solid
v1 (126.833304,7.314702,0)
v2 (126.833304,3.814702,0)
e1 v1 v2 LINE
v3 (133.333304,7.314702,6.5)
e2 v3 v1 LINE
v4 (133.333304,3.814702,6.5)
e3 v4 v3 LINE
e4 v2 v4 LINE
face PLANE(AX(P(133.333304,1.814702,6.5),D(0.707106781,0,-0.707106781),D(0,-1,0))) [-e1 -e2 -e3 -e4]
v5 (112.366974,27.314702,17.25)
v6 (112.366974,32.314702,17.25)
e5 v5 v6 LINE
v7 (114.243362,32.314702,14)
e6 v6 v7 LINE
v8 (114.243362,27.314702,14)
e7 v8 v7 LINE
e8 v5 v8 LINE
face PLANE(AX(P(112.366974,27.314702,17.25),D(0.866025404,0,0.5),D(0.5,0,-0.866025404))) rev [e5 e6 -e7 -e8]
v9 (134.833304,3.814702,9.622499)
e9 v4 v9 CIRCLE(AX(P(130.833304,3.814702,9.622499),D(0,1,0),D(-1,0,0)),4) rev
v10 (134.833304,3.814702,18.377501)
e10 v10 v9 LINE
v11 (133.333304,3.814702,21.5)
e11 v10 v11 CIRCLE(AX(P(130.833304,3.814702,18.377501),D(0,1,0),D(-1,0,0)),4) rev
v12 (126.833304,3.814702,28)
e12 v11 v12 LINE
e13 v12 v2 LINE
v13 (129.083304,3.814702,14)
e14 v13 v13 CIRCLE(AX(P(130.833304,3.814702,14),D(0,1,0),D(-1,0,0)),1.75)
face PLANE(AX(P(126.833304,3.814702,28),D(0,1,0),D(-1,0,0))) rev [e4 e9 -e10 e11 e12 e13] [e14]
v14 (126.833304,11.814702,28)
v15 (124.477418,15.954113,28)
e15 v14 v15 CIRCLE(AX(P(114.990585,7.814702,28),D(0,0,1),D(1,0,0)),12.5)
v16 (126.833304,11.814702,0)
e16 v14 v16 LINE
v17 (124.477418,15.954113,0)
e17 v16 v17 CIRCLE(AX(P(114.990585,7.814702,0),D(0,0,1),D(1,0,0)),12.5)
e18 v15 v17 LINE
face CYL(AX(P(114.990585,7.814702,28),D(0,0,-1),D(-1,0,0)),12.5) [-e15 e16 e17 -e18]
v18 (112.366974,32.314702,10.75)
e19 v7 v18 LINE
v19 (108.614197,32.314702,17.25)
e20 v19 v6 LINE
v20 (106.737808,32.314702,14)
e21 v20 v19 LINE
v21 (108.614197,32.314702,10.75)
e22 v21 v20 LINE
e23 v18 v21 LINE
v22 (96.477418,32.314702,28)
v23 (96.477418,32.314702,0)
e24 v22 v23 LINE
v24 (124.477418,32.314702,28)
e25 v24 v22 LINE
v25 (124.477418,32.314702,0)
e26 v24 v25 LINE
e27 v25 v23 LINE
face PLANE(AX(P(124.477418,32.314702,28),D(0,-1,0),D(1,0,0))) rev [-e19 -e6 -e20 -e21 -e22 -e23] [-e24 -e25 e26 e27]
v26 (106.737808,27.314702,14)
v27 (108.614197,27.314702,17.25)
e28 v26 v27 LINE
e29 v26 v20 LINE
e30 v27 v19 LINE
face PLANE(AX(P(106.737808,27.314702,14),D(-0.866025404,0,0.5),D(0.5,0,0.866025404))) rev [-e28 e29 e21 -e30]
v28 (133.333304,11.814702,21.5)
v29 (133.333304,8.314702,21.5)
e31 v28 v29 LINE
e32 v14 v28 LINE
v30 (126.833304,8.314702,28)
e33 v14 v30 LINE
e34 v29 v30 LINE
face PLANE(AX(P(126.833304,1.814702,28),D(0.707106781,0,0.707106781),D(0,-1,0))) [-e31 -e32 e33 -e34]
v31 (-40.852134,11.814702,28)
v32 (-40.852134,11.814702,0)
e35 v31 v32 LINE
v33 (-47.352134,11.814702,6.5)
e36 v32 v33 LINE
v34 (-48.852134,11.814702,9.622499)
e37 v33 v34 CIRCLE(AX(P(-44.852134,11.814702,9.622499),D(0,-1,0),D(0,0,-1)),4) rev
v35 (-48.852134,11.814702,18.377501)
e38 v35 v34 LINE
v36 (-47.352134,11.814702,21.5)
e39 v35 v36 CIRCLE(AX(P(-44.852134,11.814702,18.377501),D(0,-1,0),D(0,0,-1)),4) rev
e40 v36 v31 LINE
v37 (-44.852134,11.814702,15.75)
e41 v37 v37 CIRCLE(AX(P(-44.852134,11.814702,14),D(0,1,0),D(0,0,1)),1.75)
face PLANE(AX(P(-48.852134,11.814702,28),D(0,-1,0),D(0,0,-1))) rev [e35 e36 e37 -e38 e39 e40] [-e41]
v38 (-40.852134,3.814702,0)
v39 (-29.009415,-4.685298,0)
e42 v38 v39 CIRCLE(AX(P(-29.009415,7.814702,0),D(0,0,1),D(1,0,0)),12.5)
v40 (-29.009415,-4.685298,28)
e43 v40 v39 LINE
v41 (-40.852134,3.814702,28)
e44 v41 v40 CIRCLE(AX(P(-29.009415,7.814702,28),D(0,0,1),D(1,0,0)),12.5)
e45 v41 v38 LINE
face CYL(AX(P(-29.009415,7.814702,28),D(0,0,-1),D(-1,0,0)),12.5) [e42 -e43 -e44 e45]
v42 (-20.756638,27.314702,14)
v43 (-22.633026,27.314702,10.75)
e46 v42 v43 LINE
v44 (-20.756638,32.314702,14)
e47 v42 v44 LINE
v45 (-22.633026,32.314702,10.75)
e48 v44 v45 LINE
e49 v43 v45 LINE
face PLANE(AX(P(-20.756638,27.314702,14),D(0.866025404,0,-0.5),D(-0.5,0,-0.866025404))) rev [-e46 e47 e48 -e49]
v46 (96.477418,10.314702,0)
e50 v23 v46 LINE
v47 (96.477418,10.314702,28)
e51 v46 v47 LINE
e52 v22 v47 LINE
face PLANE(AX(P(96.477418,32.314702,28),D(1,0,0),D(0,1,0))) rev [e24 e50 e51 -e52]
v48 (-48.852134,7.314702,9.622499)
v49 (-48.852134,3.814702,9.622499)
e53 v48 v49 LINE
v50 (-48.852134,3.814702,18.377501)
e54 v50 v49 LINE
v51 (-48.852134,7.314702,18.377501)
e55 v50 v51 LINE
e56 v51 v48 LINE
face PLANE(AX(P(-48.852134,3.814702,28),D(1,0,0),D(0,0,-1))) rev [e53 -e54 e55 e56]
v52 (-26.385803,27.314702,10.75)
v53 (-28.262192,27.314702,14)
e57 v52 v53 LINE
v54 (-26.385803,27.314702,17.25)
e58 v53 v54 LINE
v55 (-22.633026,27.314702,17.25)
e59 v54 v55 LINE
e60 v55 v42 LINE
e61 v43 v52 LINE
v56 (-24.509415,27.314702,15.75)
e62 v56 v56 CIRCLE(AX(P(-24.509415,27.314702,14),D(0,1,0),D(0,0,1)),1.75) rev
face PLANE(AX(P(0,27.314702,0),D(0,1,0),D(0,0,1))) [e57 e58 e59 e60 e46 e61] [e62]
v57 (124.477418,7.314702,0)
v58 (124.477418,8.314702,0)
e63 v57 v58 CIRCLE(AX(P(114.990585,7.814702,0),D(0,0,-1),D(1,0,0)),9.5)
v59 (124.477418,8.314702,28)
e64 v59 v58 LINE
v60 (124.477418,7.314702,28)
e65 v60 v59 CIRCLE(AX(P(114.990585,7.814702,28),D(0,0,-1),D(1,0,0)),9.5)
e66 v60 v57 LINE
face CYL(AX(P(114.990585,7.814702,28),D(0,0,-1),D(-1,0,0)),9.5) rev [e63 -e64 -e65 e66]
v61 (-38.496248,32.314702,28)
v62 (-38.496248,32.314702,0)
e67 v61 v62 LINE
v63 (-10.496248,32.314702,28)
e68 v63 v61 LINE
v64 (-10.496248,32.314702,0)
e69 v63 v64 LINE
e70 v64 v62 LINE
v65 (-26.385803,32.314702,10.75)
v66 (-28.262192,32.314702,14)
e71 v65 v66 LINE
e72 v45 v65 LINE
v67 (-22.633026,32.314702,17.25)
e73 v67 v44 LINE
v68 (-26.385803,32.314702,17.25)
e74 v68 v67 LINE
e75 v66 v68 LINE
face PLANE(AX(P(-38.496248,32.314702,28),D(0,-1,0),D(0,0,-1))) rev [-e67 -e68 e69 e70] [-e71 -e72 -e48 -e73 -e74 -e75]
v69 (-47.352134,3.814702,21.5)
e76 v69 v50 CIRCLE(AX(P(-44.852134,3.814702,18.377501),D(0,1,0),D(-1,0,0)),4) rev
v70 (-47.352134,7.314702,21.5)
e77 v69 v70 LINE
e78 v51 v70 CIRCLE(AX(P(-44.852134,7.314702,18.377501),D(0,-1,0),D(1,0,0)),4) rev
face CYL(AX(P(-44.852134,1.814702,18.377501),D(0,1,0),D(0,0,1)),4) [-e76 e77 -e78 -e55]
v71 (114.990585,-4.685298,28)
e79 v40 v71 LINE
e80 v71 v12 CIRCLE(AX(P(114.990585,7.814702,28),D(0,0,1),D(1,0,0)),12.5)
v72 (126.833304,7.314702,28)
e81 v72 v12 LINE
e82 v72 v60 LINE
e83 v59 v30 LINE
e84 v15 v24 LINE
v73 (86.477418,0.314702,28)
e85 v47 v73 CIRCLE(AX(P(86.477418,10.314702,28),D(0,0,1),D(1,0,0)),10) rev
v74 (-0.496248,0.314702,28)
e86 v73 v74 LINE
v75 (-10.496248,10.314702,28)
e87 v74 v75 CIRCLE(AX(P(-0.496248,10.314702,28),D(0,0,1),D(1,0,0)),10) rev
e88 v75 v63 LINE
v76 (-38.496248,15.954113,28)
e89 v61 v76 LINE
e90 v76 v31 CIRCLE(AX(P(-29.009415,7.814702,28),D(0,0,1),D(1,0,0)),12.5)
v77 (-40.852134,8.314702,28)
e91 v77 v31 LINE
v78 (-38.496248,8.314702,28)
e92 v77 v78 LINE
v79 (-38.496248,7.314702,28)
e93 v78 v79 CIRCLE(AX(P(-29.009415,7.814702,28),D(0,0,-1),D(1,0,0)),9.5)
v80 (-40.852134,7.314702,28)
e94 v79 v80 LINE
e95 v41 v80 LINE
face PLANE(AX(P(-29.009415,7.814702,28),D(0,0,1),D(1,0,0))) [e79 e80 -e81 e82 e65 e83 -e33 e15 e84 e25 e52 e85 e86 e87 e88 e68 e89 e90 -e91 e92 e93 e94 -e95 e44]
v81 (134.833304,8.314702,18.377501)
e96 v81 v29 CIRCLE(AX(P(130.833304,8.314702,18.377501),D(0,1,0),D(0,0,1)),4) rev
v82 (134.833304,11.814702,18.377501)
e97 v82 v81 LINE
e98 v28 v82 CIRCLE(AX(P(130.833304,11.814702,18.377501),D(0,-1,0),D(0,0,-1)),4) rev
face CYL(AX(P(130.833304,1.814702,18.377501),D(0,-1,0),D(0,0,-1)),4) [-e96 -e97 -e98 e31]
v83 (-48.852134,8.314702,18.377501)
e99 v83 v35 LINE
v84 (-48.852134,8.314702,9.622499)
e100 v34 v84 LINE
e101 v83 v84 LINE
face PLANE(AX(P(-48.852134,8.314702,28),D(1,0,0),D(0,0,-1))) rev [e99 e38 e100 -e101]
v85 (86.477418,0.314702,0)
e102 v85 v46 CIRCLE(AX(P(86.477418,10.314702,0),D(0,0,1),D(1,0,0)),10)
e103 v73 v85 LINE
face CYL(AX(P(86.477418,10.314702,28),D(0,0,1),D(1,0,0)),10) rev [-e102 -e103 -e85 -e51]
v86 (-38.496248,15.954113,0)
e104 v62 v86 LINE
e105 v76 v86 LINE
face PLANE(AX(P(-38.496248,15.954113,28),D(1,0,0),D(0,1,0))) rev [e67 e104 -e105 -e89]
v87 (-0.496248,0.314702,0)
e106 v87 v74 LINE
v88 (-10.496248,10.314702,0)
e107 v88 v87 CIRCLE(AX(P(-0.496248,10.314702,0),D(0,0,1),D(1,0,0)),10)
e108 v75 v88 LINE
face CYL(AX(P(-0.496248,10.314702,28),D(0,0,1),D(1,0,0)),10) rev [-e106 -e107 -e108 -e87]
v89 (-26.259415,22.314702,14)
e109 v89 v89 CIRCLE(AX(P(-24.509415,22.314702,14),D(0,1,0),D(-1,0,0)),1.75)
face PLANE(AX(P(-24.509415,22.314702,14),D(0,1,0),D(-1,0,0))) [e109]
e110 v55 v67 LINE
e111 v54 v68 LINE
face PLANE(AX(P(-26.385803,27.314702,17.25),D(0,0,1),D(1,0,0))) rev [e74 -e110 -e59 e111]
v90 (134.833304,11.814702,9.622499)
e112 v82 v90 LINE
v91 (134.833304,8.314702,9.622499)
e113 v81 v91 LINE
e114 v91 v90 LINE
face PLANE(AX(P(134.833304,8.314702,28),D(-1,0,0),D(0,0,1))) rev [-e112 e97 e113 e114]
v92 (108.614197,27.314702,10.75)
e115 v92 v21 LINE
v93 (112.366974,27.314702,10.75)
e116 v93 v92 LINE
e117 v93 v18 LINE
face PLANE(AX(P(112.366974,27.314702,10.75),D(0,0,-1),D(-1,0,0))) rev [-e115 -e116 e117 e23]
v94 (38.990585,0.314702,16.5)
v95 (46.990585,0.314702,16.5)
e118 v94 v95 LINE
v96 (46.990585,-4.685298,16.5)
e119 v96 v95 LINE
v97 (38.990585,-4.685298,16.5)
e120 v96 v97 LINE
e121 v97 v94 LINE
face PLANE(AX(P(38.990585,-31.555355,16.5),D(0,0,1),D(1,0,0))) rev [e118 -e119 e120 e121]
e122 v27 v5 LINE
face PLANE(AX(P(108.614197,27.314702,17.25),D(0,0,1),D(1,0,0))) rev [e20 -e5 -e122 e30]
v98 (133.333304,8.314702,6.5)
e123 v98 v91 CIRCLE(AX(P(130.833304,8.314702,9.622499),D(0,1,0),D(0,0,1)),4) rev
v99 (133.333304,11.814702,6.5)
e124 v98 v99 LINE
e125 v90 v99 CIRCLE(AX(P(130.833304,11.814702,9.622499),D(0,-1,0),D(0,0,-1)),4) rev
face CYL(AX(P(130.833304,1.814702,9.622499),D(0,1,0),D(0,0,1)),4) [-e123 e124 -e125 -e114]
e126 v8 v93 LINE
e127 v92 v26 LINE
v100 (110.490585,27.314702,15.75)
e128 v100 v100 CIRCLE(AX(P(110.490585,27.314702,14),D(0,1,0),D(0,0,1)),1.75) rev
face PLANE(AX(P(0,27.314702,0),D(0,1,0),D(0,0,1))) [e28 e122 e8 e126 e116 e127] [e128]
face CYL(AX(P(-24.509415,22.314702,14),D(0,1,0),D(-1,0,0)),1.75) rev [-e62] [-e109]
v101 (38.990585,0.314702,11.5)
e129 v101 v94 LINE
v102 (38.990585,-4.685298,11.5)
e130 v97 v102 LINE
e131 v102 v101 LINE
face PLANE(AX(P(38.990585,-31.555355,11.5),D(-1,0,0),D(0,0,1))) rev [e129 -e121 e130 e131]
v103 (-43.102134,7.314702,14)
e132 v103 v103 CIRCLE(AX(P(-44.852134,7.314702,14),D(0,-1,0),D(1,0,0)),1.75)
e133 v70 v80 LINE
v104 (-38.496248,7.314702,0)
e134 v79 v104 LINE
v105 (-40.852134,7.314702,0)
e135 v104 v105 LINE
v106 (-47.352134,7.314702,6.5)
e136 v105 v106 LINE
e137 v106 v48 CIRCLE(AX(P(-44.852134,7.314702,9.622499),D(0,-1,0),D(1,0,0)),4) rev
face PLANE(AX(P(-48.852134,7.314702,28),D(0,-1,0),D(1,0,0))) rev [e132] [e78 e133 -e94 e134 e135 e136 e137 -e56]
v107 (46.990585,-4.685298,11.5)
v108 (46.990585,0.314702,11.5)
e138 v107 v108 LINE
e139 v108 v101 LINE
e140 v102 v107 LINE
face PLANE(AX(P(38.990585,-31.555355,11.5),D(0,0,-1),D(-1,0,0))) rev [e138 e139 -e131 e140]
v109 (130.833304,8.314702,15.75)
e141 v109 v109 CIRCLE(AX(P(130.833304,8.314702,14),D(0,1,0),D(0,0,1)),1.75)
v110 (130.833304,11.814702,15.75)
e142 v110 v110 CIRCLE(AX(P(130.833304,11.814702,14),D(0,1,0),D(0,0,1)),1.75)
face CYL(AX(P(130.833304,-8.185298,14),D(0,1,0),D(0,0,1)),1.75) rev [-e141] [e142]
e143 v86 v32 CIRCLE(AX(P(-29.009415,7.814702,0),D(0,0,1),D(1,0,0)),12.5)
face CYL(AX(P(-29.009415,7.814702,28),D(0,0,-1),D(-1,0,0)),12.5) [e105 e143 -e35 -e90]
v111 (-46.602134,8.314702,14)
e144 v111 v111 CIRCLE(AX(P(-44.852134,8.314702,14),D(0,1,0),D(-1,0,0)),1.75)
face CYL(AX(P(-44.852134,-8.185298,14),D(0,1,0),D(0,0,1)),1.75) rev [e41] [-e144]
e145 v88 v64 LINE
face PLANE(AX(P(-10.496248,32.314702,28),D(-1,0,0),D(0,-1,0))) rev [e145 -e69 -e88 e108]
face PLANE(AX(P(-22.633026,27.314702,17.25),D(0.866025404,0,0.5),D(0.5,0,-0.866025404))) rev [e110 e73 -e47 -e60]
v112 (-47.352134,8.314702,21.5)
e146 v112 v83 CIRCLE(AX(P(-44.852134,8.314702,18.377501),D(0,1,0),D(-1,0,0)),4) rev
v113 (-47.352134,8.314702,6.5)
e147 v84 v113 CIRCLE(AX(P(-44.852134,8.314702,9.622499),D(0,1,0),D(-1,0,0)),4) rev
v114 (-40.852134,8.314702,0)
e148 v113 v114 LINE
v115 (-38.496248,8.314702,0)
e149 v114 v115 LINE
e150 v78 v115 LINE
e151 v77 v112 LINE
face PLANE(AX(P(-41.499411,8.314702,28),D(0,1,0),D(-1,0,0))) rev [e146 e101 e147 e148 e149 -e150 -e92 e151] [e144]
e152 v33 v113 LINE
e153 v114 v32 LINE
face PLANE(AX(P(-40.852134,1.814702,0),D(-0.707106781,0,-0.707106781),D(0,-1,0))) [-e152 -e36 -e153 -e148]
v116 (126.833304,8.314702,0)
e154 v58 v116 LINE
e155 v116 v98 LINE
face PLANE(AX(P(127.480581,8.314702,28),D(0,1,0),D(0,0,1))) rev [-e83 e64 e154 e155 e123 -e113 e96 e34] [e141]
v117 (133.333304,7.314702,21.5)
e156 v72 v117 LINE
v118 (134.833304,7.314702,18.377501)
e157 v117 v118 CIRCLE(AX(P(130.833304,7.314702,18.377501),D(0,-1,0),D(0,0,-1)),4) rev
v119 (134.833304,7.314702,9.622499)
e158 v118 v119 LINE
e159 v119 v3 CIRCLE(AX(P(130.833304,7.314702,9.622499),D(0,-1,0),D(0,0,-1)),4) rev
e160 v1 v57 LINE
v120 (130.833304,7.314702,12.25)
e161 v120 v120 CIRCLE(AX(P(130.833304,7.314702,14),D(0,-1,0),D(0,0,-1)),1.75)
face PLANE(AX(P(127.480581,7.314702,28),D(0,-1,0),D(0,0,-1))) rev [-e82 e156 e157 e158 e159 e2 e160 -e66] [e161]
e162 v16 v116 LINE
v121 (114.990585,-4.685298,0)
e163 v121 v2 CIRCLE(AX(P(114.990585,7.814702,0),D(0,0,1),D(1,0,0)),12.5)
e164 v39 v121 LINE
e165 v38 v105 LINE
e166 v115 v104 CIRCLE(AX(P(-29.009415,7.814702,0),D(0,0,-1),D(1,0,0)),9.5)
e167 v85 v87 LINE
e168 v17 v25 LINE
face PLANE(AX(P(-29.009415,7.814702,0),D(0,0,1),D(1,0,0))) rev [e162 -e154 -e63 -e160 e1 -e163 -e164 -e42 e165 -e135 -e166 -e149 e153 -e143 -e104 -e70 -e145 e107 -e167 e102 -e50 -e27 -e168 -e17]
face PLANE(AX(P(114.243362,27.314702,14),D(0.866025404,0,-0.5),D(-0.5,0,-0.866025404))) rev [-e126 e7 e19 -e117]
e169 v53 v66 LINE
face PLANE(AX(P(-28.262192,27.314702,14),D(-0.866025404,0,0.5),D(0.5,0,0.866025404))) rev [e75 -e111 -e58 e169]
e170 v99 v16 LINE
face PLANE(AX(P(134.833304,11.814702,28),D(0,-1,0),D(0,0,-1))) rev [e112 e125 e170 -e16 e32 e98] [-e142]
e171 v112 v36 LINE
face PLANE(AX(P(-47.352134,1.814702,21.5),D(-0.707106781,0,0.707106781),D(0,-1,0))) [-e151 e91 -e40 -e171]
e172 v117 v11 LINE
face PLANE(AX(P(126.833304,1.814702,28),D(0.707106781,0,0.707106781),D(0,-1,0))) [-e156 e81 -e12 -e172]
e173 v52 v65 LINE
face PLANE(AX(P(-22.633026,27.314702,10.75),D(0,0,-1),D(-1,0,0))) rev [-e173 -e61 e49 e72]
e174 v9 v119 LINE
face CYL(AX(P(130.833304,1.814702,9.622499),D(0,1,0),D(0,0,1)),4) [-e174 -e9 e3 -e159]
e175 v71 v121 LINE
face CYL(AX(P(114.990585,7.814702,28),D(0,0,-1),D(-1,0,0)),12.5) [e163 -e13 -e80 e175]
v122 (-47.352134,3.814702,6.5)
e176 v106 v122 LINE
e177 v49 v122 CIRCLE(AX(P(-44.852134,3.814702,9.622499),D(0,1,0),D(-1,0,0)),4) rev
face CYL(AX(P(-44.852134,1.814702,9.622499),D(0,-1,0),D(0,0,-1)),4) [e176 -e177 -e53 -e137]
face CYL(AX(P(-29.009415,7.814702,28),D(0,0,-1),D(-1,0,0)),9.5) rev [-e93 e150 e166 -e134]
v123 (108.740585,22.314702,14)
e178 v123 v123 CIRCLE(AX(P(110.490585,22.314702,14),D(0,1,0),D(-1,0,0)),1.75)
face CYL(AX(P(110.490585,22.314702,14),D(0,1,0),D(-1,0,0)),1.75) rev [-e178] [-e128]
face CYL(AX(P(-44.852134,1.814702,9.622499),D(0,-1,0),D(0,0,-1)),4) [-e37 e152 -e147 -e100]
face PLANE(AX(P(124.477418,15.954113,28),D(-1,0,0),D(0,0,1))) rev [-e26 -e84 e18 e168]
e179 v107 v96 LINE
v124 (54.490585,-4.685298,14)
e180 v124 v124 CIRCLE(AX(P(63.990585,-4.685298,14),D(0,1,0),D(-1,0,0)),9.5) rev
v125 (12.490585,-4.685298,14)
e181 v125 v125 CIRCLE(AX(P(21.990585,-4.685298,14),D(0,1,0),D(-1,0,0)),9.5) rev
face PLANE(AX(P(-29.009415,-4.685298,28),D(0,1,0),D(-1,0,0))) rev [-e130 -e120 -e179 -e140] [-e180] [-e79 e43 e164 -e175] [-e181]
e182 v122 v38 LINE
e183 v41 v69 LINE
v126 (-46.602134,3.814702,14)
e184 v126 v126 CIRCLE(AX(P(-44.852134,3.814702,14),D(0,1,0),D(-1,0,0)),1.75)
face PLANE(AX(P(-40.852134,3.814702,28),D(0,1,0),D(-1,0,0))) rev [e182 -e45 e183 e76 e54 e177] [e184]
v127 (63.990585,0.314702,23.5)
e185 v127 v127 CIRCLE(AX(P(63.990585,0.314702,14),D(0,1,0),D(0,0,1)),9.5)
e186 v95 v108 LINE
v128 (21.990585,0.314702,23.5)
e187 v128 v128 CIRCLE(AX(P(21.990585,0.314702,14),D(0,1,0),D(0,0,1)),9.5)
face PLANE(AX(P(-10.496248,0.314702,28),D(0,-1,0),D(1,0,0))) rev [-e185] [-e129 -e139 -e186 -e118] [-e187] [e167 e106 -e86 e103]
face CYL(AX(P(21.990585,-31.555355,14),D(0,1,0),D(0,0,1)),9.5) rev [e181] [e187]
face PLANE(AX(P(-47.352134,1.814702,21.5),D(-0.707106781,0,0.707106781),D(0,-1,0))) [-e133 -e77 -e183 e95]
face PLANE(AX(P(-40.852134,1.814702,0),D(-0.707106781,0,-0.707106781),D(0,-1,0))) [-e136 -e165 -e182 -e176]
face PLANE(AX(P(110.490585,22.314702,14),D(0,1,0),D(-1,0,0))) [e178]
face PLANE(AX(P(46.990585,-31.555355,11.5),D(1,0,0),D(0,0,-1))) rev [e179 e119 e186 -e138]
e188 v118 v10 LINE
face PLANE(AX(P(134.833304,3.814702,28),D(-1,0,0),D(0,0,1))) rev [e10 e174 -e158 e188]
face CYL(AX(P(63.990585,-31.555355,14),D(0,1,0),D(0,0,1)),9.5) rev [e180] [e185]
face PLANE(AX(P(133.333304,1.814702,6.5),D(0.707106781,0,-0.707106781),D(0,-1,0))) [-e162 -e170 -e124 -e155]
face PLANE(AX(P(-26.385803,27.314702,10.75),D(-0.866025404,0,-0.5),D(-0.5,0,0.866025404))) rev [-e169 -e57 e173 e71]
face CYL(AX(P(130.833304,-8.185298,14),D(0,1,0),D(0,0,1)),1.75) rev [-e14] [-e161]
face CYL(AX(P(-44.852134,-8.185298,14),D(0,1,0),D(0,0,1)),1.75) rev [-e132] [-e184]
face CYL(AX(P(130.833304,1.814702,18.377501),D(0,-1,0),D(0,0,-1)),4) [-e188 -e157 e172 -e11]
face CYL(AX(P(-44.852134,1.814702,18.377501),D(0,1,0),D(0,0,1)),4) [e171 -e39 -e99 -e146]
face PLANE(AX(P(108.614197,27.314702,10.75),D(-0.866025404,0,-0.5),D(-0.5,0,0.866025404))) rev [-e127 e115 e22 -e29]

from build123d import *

# Parameters (mm, degrees)
BOSS_EXTRUDE3_DEPTH = 28
FILLET1_R           = 10
SKETCH8_R           = 9.5
SKETCH8_W           = 8
SKETCH8_H           = 5
CUT_EXTRUDE4_DEPTH  = 5
SKETCH9_R           = 1.75
CUT_EXTRUDE5_DEPTH  = 20
SKETCH10_R          = 1.75
CUT_EXTRUDE6_DEPTH  = 10
CUT_EXTRUDE8_DEPTH  = 10
CHAMFER1_SIZE       = 6.5
FILLET3_R           = 4
CUT_EXTRUDE9_DEPTH  = 5


# Some blends are built 0.0001 mm under size
with BuildPart() as part:
    # Sketch7 → Boss-Extrude3 (new body)
    with BuildSketch(Plane.XY):
        with BuildLine():
            Line((-29.009414831, -4.685297633), (114.990585169, -4.685297633))
            ThreePointArc((114.990585169, -4.685297633), (122.279275038, -2.340345638), (126.833304451, 3.814702367))
            Line((126.833304451, 3.814702367), (134.833304451, 3.814702367))
            Line((134.833304451, 3.814702367), (134.833304451, 7.314702367))
            Line((134.833304451, 7.314702367), (127.480581166, 7.314702367))
            Line((127.480581166, 7.314702367), (124.47741815, 7.314702367))
            ThreePointArc((124.47741815, 7.314702367), (105.490585169, 7.814702367), (124.47741815, 8.314702367))
            Line((124.47741815, 8.314702367), (127.480581166, 8.314702367))
            Line((127.480581166, 8.314702367), (134.833304451, 8.314702367))
            Line((134.833304451, 8.314702367), (134.833304451, 11.814702367))
            Line((134.833304451, 11.814702367), (126.833304451, 11.814702367))
            ThreePointArc((126.833304451, 11.814702367), (125.854338173, 13.997652364), (124.47741815, 15.954112665))
            Line((124.47741815, 15.954112665), (124.47741815, 32.314702367))
            Line((124.47741815, 32.314702367), (96.47741815, 32.314702367))
            Line((96.47741815, 32.314702367), (96.47741815, 0.314702367))
            Line((96.47741815, 0.314702367), (-10.496247811, 0.314702367))
            Line((-10.496247811, 0.314702367), (-10.496247811, 32.314702367))
            Line((-10.496247811, 32.314702367), (-38.496247811, 32.314702367))
            Line((-38.496247811, 32.314702367), (-38.496247811, 15.954112665))
            ThreePointArc((-38.496247811, 15.954112665), (-39.873167835, 13.997652364), (-40.852134113, 11.814702367))
            Line((-40.852134113, 11.814702367), (-48.852134113, 11.814702367))
            Line((-48.852134113, 11.814702367), (-48.852134113, 8.314702367))
            Line((-48.852134113, 8.314702367), (-41.499410828, 8.314702367))
            Line((-41.499410828, 8.314702367), (-38.496247811, 8.314702367))
            ThreePointArc((-38.496247811, 8.314702367), (-19.509414831, 7.814702367), (-38.496247811, 7.314702367))
            Line((-38.496247811, 7.314702367), (-41.499410828, 7.314702367))
            Line((-41.499410828, 7.314702367), (-48.852134113, 7.314702367))
            Line((-48.852134113, 7.314702367), (-48.852134113, 3.814702367))
            Line((-48.852134113, 3.814702367), (-40.852134113, 3.814702367))
            ThreePointArc((-40.852134113, 3.814702367), (-36.298104699, -2.340345638), (-29.009414831, -4.685297633))
        make_face()
    extrude(amount=BOSS_EXTRUDE3_DEPTH)

    # Fillet1
    fillet1_edges = [part.edges().sort_by_distance(p)[0] for p in [
        (-10.496247811, 0.314702367, 14),
        (96.47741815, 0.314702367, 14),
    ]]
    fillet(fillet1_edges, radius=FILLET1_R)

    # Sketch8 → Cut-Extrude4 (cut)
    with BuildSketch(Plane(origin=(0, 0.314702367, 0), x_dir=(1, 0, 0), z_dir=(0, 1, 0))):
        with Locations(Location((63.990585169, -14, 0), (0, 0, 270))):
            Circle(SKETCH8_R)
        with Locations(Location((21.990585169, -14, 0), (0, 0, 270))):
            Circle(SKETCH8_R)
        with Locations((42.990585169, -14)):
            Rectangle(SKETCH8_W, SKETCH8_H)
    extrude(amount=-CUT_EXTRUDE4_DEPTH, mode=Mode.SUBTRACT)

    # Sketch9 → Cut-Extrude5 (cut)
    with BuildSketch(Plane(origin=(0, 11.814702367, 0), x_dir=(1, 0, 0), z_dir=(0, 1, 0))):
        with Locations(Location((130.833304451, -14, 0), (0, 0, 270))):
            Circle(SKETCH9_R)
        with Locations(Location((-44.852134113, -14, 0), (0, 0, 180))):
            Circle(SKETCH9_R)
    extrude(amount=-CUT_EXTRUDE5_DEPTH, mode=Mode.SUBTRACT)

    # Sketch10 → Cut-Extrude6 (cut)
    with BuildSketch(Plane(origin=(0, 32.314702367, 0), x_dir=(1, 0, 0), z_dir=(0, 1, 0))):
        with Locations(Location((110.490585169, -14, 0), (0, 0, 180))):
            Circle(SKETCH10_R)
        with Locations(Location((-24.509414831, -14, 0), (0, 0, 180))):
            Circle(SKETCH10_R)
    extrude(amount=-CUT_EXTRUDE6_DEPTH, mode=Mode.SUBTRACT)

    # Sketch12 → Cut-Extrude8 (cut)
    with BuildSketch(Plane(origin=(0, 11.814702367, 0), x_dir=(1, 0, 0), z_dir=(0, 1, 0))):
        Polygon((130.833304451, -21.5), (126.833304451, -21.5), (126.833304451, -28), (134.833304451, -28), (134.833304451, -21.5), align=None)
        Polygon((130.833304451, -6.5), (126.833304451, -6.5), (126.833304451, 0), (134.833304451, 0), (134.833304451, -6.5), align=None)
        Polygon((-44.852134113, -6.5), (-40.852134113, -6.5), (-40.852134113, 0), (-48.852134113, 0), (-48.852134113, -6.5), align=None)
        Polygon((-44.852134113, -21.5), (-48.852134113, -21.5), (-48.852134113, -28), (-40.852134113, -28), (-40.852134113, -21.5), align=None)
    extrude(amount=-CUT_EXTRUDE8_DEPTH, mode=Mode.SUBTRACT)

    # Chamfer1
    chamfer1_edges = [part.edges().sort_by_distance(p)[0] for p in [
        (126.833304451, 10.064702367, 6.5),
        (126.833304451, 5.564702367, 6.5),
        (126.833304451, 5.564702367, 21.5),
        (126.833304451, 10.064702367, 21.5),
        (-40.852134113, 5.564702367, 21.5),
        (-40.852134113, 5.564702367, 6.5),
        (-40.852134113, 10.064702367, 6.5),
        (-40.852134113, 10.064702367, 21.5),
    ]]
    chamfer(chamfer1_edges, length=CHAMFER1_SIZE - 0.0001)  # a hair under: the kernel refuses the full size

    # Fillet3
    # the kernel refuses this fillet: 4 mm, written as the material it takes off along each edge
    with BuildSketch(Plane(origin=(134.833304451, 19.621150019, 21.5), x_dir=(-1, 0, 0), z_dir=(0, -1, 0))) as fillet3_piece_1:
        with BuildLine():
            CenterArc((4, 3.122579061), FILLET3_R, 180, 51.319647456)
            Line((0, 3.122579061), (-0.08, 3.122579061))
            Line((-0.08, 3.122579061), (-0.08, 0))
            Line((-0.08, 0), (0, -0.08))
            ThreePointArc((0, -0.08), (0.75005, -0.08), (1.450102, -0.062451581))
            Line((1.450102, -0.062451581), (1.5001, 0))
        make_face()
    extrude(amount=19.112895303, mode=Mode.SUBTRACT)
    with BuildSketch(Plane(origin=(134.833304451, 15.121150019, 21.5), x_dir=(0, 0, -1), z_dir=(0, -1, 0)), Plane(origin=(-48.852134113, 15.121150019, 6.5), x_dir=(0, 0, 1), z_dir=(0, -1, 0)), Plane(origin=(-48.852134113, 19.621150019, 6.5), x_dir=(0, 0, 1), z_dir=(0, -1, 0))) as fillet3_piece_2:
        with BuildLine():
            CenterArc((3.122579061, -4), FILLET3_R, 90, 51.319647456)
            Line((0, -1.5001), (-0.062451581, -1.450102))
            ThreePointArc((-0.062451581, -1.450102), (-0.08, -0.75005), (-0.08, 0))
            Line((-0.08, 0), (0, 0.08))
            Line((0, 0.08), (3.122579061, 0.08))
            Line((3.122579061, 0.08), (3.122579061, 0))
        make_face()
    extrude(amount=19.112895303, mode=Mode.SUBTRACT)
    with BuildSketch(Plane(origin=(134.833304451, 15.121150019, 6.5), x_dir=(0, 0, 1), z_dir=(0, -1, 0)), Plane(origin=(134.833304451, 19.621150019, 6.5), x_dir=(0, 0, 1), z_dir=(0, -1, 0)), Plane(origin=(-48.852134113, 19.621150019, 21.5), x_dir=(0, 0, -1), z_dir=(0, -1, 0))) as fillet3_piece_3:
        with BuildLine():
            CenterArc((3.122579061, 4), FILLET3_R, 218.680352544, 51.319647456)
            Line((0, 1.5001), (-0.062451581, 1.450102))
            ThreePointArc((-0.062451581, 1.450102), (-0.08, 0.75005), (-0.08, 0))
            Line((-0.08, 0), (0, -0.08))
            Line((0, -0.08), (3.122579061, -0.08))
            Line((3.122579061, -0.08), (3.122579061, 0))
        make_face()
    extrude(amount=19.112895303, mode=Mode.SUBTRACT)
    with BuildSketch(Plane(origin=(-48.852134113, 15.121150019, 21.5), x_dir=(1, 0, 0), z_dir=(0, -1, 0))) as fillet3_piece_4:
        with BuildLine():
            CenterArc((4, -3.122579061), FILLET3_R, 128.680352544, 51.319647456)
            Line((0, -3.122579061), (-0.08, -3.122579061))
            Line((-0.08, -3.122579061), (-0.08, 0))
            Line((-0.08, 0), (0, 0.08))
            ThreePointArc((0, 0.08), (0.75005, 0.08), (1.450102, 0.062451581))
            Line((1.450102, 0.062451581), (1.5001, 0))
        make_face()
    extrude(amount=19.112895303, mode=Mode.SUBTRACT)

    # Sketch13 → Cut-Extrude9 (cut)
    with BuildSketch(Plane(origin=(0, 32.314702367, 0), x_dir=(1, 0, 0), z_dir=(0, 1, 0))):
        Polygon((108.614196794, -17.25), (112.366973544, -17.25), (114.243361919, -14), (112.366973544, -10.75), (108.614196794, -10.75), (106.737808419, -14), align=None)
        Polygon((-20.756638081, -14), (-22.633026456, -10.75), (-26.385803206, -10.75), (-28.262191581, -14), (-26.385803206, -17.25), (-22.633026456, -17.25), align=None)
    extrude(amount=-CUT_EXTRUDE9_DEPTH, mode=Mode.SUBTRACT)


solid = part.part
